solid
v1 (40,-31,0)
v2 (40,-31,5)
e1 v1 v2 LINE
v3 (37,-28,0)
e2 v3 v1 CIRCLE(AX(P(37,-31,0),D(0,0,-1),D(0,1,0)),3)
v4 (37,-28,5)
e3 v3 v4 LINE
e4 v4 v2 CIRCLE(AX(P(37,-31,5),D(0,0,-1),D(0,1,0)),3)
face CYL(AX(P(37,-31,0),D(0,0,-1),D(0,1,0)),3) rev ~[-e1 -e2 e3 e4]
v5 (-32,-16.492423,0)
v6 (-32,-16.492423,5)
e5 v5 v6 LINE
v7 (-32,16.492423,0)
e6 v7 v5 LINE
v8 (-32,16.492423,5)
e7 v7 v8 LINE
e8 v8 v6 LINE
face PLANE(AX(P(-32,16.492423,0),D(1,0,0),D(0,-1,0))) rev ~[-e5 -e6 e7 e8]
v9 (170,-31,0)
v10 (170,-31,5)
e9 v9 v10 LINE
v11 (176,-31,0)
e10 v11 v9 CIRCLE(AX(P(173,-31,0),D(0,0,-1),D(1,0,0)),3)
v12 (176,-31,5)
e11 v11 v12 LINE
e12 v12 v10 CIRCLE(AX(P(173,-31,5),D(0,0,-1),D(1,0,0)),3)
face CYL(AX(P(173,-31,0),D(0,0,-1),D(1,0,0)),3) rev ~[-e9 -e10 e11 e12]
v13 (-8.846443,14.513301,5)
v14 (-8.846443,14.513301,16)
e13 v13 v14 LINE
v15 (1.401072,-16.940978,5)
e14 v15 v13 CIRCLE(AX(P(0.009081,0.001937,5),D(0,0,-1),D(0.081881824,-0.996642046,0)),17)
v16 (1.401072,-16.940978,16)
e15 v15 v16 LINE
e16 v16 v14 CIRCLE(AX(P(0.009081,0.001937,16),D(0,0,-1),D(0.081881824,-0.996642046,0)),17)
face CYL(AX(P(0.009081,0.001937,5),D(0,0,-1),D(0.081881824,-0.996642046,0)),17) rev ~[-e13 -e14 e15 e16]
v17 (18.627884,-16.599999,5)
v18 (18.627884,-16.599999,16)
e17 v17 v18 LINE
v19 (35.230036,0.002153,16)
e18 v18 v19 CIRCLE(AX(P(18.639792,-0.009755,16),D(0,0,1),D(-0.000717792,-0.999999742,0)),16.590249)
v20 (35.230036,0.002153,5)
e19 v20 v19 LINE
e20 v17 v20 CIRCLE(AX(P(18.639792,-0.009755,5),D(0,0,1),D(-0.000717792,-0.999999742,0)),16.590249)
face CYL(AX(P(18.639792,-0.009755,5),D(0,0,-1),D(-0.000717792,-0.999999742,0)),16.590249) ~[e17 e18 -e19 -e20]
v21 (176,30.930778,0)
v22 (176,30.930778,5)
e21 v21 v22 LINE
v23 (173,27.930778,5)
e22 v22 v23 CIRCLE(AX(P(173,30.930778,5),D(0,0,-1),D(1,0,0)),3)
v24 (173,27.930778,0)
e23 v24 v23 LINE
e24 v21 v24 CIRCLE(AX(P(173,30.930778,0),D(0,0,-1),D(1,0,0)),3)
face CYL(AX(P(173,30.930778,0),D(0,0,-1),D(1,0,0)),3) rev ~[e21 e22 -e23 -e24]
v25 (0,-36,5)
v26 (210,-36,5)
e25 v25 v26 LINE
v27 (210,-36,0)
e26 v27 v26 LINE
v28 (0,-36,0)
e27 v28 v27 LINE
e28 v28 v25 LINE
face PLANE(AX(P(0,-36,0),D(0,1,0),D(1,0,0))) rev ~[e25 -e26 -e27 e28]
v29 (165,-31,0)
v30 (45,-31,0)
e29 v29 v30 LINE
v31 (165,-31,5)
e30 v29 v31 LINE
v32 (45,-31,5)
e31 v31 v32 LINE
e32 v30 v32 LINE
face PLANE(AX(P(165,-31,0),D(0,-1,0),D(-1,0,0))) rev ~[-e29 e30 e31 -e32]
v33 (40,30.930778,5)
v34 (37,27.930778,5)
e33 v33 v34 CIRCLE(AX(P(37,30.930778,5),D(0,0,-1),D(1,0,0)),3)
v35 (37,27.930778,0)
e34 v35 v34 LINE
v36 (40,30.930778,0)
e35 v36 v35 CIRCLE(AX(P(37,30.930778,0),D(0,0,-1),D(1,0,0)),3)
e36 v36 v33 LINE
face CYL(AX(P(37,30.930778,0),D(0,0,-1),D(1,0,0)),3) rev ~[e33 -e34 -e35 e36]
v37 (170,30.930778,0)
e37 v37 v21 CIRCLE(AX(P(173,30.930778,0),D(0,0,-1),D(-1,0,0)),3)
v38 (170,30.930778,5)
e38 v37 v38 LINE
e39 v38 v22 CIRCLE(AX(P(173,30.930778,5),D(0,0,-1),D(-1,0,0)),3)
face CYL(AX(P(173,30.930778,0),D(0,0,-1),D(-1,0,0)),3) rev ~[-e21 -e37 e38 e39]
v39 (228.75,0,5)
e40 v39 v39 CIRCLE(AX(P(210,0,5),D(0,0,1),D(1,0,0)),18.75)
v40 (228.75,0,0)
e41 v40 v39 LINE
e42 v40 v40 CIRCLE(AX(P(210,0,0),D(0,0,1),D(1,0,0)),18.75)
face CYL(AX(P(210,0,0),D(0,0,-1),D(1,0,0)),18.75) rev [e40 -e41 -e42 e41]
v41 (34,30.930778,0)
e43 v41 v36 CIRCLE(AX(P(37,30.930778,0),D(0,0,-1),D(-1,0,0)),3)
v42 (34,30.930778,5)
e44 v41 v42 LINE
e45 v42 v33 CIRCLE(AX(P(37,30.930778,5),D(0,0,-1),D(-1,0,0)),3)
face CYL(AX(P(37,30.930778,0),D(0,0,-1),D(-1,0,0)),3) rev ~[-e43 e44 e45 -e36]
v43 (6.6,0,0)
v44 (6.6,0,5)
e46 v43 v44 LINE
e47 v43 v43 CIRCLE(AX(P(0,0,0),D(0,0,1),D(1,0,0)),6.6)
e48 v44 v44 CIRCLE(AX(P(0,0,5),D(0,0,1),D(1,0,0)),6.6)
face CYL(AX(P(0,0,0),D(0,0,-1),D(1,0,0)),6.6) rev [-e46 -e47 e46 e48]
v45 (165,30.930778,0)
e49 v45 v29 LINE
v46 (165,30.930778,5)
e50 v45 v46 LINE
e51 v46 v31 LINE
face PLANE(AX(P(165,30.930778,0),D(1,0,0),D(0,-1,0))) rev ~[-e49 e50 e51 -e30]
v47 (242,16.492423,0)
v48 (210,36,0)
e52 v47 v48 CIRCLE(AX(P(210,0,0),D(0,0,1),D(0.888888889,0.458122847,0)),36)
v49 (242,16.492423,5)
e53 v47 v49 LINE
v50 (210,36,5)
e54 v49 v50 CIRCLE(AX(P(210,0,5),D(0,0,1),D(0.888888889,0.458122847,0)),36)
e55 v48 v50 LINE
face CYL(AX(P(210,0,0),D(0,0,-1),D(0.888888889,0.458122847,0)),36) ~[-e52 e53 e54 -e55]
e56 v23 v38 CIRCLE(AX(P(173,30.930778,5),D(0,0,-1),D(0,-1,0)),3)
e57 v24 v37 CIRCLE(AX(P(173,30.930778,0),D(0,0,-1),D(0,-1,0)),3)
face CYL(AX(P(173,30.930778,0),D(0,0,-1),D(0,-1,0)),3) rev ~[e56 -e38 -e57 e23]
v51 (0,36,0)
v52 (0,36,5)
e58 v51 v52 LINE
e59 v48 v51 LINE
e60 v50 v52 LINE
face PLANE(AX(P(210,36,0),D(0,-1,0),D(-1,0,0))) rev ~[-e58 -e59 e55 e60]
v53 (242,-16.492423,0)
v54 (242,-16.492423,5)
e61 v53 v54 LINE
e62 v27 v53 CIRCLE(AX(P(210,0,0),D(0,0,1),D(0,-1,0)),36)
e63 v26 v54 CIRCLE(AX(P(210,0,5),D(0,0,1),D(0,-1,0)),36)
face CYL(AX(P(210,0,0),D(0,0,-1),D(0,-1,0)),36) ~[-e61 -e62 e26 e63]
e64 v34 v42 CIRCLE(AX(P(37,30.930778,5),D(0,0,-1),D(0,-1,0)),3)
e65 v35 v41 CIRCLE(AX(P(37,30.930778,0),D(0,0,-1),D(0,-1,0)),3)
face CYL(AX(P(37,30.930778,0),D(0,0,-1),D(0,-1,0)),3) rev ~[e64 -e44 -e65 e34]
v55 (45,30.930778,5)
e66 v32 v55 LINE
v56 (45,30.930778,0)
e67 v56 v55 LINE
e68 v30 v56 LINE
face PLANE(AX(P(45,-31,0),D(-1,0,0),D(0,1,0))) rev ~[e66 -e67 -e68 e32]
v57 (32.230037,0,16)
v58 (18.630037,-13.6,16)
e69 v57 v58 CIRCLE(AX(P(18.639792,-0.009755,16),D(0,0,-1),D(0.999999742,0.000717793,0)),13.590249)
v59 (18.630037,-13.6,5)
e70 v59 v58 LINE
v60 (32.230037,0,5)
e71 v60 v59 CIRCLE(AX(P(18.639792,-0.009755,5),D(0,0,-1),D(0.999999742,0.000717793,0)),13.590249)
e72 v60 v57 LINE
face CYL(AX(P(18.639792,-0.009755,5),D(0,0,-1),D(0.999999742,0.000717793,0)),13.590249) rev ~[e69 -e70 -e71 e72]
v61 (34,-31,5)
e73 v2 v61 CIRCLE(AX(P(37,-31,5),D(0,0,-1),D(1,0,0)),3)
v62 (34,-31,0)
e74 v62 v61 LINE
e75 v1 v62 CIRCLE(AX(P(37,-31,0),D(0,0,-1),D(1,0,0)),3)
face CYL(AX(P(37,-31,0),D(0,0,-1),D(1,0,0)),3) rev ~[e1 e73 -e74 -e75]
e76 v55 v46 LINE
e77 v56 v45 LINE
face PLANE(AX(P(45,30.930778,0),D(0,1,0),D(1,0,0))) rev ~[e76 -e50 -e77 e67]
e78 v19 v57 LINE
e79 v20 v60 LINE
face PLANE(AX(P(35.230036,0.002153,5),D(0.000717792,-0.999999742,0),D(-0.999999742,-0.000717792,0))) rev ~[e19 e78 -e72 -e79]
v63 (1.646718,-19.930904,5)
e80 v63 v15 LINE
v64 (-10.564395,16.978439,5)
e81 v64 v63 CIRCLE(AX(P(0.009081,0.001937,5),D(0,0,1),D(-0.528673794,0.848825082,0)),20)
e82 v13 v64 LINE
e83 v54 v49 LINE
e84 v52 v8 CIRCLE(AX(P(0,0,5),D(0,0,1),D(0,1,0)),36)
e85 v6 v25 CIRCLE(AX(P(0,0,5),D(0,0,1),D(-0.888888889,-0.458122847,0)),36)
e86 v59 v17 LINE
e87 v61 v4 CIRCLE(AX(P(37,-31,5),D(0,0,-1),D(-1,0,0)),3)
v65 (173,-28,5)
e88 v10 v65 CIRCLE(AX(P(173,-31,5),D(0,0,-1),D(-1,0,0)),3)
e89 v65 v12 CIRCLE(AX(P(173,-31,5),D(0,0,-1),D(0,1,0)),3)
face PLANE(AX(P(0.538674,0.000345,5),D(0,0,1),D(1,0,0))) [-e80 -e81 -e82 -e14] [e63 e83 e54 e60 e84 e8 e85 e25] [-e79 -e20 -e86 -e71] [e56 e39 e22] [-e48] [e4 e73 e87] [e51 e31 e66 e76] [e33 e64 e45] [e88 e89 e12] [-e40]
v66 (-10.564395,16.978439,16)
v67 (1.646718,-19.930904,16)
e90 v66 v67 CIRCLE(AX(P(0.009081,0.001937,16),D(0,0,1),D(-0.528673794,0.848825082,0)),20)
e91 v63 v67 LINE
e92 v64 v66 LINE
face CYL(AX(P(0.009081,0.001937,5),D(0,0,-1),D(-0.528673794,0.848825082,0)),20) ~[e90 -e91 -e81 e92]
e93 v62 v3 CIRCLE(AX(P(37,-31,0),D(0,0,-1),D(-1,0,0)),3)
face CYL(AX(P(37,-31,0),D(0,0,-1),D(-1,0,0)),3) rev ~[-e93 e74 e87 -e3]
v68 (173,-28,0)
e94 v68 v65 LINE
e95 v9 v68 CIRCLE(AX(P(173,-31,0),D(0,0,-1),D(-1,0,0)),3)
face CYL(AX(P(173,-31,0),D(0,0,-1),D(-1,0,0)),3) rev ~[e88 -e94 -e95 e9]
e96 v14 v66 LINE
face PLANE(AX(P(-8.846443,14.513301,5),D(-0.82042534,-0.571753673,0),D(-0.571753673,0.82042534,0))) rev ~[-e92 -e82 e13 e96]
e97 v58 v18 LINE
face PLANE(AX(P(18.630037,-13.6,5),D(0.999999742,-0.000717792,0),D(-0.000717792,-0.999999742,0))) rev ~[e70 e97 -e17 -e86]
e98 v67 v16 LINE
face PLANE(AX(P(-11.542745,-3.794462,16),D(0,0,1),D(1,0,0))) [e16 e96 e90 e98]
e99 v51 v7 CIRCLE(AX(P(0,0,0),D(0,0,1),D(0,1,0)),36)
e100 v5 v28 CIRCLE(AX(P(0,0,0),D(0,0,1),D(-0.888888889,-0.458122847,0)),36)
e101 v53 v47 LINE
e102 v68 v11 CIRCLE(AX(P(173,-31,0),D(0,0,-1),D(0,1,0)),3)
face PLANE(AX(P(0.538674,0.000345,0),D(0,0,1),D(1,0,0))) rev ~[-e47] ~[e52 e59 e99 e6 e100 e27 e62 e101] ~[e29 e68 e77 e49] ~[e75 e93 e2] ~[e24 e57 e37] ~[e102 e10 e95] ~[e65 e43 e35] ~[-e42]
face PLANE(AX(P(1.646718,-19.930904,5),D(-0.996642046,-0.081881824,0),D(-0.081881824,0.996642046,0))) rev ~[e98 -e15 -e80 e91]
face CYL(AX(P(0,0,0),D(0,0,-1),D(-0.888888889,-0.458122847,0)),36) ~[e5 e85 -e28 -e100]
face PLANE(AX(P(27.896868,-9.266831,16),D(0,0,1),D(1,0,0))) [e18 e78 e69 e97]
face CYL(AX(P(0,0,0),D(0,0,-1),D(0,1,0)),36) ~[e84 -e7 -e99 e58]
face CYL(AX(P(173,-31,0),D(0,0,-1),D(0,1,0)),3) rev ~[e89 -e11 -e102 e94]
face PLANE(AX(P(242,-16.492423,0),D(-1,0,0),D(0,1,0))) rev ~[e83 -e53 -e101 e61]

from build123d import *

# Parameters (mm, degrees)
F0_R     = 30
F0_R_2   = 10
F0_R_3   = 21.5
F0_R_4   = 18.75
F0_R_5   = 6.6
F1_DEPTH = 5
F3_DEPTH = 11


with BuildPart() as f1:
    # F0 (on Top) → F1 (new body)
    with BuildSketch(Plane.XY):
        with BuildLine():
            ThreePointArc((18.3030052177, -31), (31.2642622481, -17.8478543831), (36, 0))
            ThreePointArc((36, 0), (31.2978497092, 17.7888898917), (18.4197442455, 30.9307779069))
            ThreePointArc((18.4197442455, 30.9307779069), (9.5522770937, 34.7095664382), (0, 36))
            ThreePointArc((0, 36), (-18.7386337537, 30.7386337537), (-32, 16.4924225025))
            Line((-32, 16.4924225025), (-32, -16.4924225025))
            ThreePointArc((-32, -16.4924225025), (-18.7386337537, -30.7386337537), (0, -36))
            ThreePointArc((0, -36), (9.4868329805, -34.7275107084), (18.3030052177, -31))
        make_face()
        Circle(F0_R, mode=Mode.SUBTRACT)
        with BuildLine():
            ThreePointArc((242, 16.4924225025), (228.7386337537, 30.7386337537), (210, 36))
            ThreePointArc((210, 36), (200.4477229063, 34.7095664382), (191.5802557545, 30.9307779069))
            ThreePointArc((191.5802557545, 30.9307779069), (174.0000639573, -0.0678595955), (191.6969947823, -31))
            ThreePointArc((191.6969947823, -31), (200.5131670195, -34.7275107084), (210, -36))
            ThreePointArc((210, -36), (228.7386337537, -30.7386337537), (242, -16.4924225025))
            Line((242, -16.4924225025), (242, 16.4924225025))
        make_face()
        with Locations((210, 0)):
            Circle(F0_R, mode=Mode.SUBTRACT)
        Circle(F0_R)
        Circle(F0_R_2, mode=Mode.SUBTRACT)
        with Locations((210, 0)):
            Circle(F0_R)
        with Locations((210, 0)):
            Circle(F0_R_3, mode=Mode.SUBTRACT)
        with Locations((210, 0)):
            Circle(F0_R_3)
        with Locations((210, 0)):
            Circle(F0_R_4, mode=Mode.SUBTRACT)
        with BuildLine():
            ThreePointArc((19.6214168703, 36), (23.4046464655, 33.6633706545), (26.9125802938, 30.9307779069))
            Line((26.9125802938, 30.9307779069), (34, 30.9307779069))
            ThreePointArc((34, 30.9307779069), (37, 33.9307779069), (40, 30.9307779069))
            Line((40, 30.9307779069), (45, 30.9307779069))
            Line((45, 30.9307779069), (165, 30.9307779069))
            Line((165, 30.9307779069), (170, 30.9307779069))
            ThreePointArc((170, 30.9307779069), (173, 33.9307779069), (176, 30.9307779069))
            Line((176, 30.9307779069), (183.0874197062, 30.9307779069))
            ThreePointArc((183.0874197062, 30.9307779069), (186.5953535345, 33.6633706545), (190.3785831296, 36))
            Line((190.3785831296, 36), (19.6214168703, 36))
        make_face()
        with BuildLine():
            Line((34, -31), (26.83281573, -31))
            ThreePointArc((26.83281573, -31), (23.361269906, -33.693487032), (19.6214168703, -36))
            Line((19.6214168703, -36), (190.3785831296, -36))
            ThreePointArc((190.3785831296, -36), (186.638730094, -33.693487032), (183.16718427, -31))
            Line((183.16718427, -31), (176, -31))
            ThreePointArc((176, -31), (173, -34), (170, -31))
            Line((170, -31), (165, -31))
            Line((165, -31), (45, -31))
            Line((45, -31), (40, -31))
            ThreePointArc((40, -31), (37, -34), (34, -31))
        make_face()
        with BuildLine():
            Line((37, 27.9307779069), (37, 17.6635217327))
            ThreePointArc((37, 17.6635217327), (39.9874980463, 9.0553851381), (41, 0))
            ThreePointArc((41, 0), (39.9874980463, -9.0553851381), (37, -17.6635217327))
            Line((37, -17.6635217327), (37, -28))
            ThreePointArc((37, -28), (39.1213203436, -28.8786796564), (40, -31))
            Line((40, -31), (45, -31))
            Line((45, -31), (45, 30.9307779069))
            Line((45, 30.9307779069), (40, 30.9307779069))
            ThreePointArc((40, 30.9307779069), (39.1213203436, 28.8094575634), (37, 27.9307779069))
        make_face()
        with BuildLine():
            ThreePointArc((173, -17.6635217327), (169, 0), (173, 17.6635217327))
            Line((173, 17.6635217327), (173, 27.9307779069))
            ThreePointArc((173, 27.9307779069), (170.8786796564, 28.8094575634), (170, 30.9307779069))
            Line((170, 30.9307779069), (165, 30.9307779069))
            Line((165, 30.9307779069), (165, -31))
            Line((165, -31), (170, -31))
            ThreePointArc((170, -31), (170.8786796564, -28.8786796564), (173, -28))
            Line((173, -28), (173, -17.6635217327))
        make_face()
        Circle(F0_R_2)
        Circle(F0_R_5, mode=Mode.SUBTRACT)
        with BuildLine():
            ThreePointArc((18.4197442455, 30.9307779069), (31.2978497092, 17.7888898917), (36, 0))
            ThreePointArc((36, 0), (31.2642622481, -17.8478543831), (18.3030052177, -31))
            Line((18.3030052177, -31), (26.83281573, -31))
            ThreePointArc((26.83281573, -31), (32.6055594055, -24.8571417474), (37, -17.6635217327))
            Line((37, -17.6635217327), (37, 17.6635217327))
            ThreePointArc((37, 17.6635217327), (32.6375474194, 24.815126404), (26.9125802938, 30.9307779069))
            Line((26.9125802938, 30.9307779069), (18.4197442455, 30.9307779069))
        make_face()
        with BuildLine():
            Line((191.5802557545, 30.9307779069), (183.0874197062, 30.9307779069))
            ThreePointArc((183.0874197062, 30.9307779069), (177.3624525806, 24.815126404), (173, 17.6635217327))
            Line((173, 17.6635217327), (173, -17.6635217327))
            ThreePointArc((173, -17.6635217327), (177.3944405945, -24.8571417474), (183.16718427, -31))
            Line((183.16718427, -31), (191.6969947823, -31))
            ThreePointArc((191.6969947823, -31), (174.0000639573, -0.0678595955), (191.5802557545, 30.9307779069))
        make_face()
        with BuildLine():
            ThreePointArc((41, 0), (39.9874980463, 9.0553851381), (37, 17.6635217327))
            Line((37, 17.6635217327), (37, -17.6635217327))
            ThreePointArc((37, -17.6635217327), (39.9874980463, -9.0553851381), (41, 0))
        make_face()
        with BuildLine():
            Line((173, -17.6635217327), (173, 17.6635217327))
            ThreePointArc((173, 17.6635217327), (169, 0), (173, -17.6635217327))
        make_face()
        with BuildLine():
            ThreePointArc((0, 36), (9.5522770937, 34.7095664382), (18.4197442455, 30.9307779069))
            Line((18.4197442455, 30.9307779069), (26.9125802938, 30.9307779069))
            ThreePointArc((26.9125802938, 30.9307779069), (23.4046464655, 33.6633706545), (19.6214168703, 36))
            Line((19.6214168703, 36), (0, 36))
        make_face()
        with BuildLine():
            Line((210, 36), (190.3785831296, 36))
            ThreePointArc((190.3785831296, 36), (186.5953535345, 33.6633706545), (183.0874197062, 30.9307779069))
            Line((183.0874197062, 30.9307779069), (191.5802557545, 30.9307779069))
            ThreePointArc((191.5802557545, 30.9307779069), (200.4477229063, 34.7095664382), (210, 36))
        make_face()
        with BuildLine():
            Line((26.83281573, -31), (18.3030052177, -31))
            ThreePointArc((18.3030052177, -31), (9.4868329805, -34.7275107084), (0, -36))
            Line((0, -36), (19.6214168703, -36))
            ThreePointArc((19.6214168703, -36), (23.361269906, -33.693487032), (26.83281573, -31))
        make_face()
        with BuildLine():
            ThreePointArc((183.16718427, -31), (186.638730094, -33.693487032), (190.3785831296, -36))
            Line((190.3785831296, -36), (210, -36))
            ThreePointArc((210, -36), (200.5131670195, -34.7275107084), (191.6969947823, -31))
            Line((191.6969947823, -31), (183.16718427, -31))
        make_face()
        with BuildLine():
            ThreePointArc((37, -17.6635217327), (32.6055594055, -24.8571417474), (26.83281573, -31))
            Line((26.83281573, -31), (34, -31))
            ThreePointArc((34, -31), (34.8786796564, -28.8786796564), (37, -28))
            Line((37, -28), (37, -17.6635217327))
        make_face()
        with BuildLine():
            Line((176, -31), (183.16718427, -31))
            ThreePointArc((183.16718427, -31), (177.3944405945, -24.8571417474), (173, -17.6635217327))
            Line((173, -17.6635217327), (173, -28))
            ThreePointArc((173, -28), (175.1213203436, -28.8786796564), (176, -31))
        make_face()
        with BuildLine():
            Line((34, 30.9307779069), (26.9125802938, 30.9307779069))
            ThreePointArc((26.9125802938, 30.9307779069), (32.6375474194, 24.815126404), (37, 17.6635217327))
            Line((37, 17.6635217327), (37, 27.9307779069))
            ThreePointArc((37, 27.9307779069), (34.8786796564, 28.8094575634), (34, 30.9307779069))
        make_face()
        with BuildLine():
            ThreePointArc((173, 17.6635217327), (177.3624525806, 24.815126404), (183.0874197062, 30.9307779069))
            Line((183.0874197062, 30.9307779069), (176, 30.9307779069))
            ThreePointArc((176, 30.9307779069), (175.1213203436, 28.8094575634), (173, 27.9307779069))
            Line((173, 27.9307779069), (173, 17.6635217327))
        make_face()
    extrude(amount=F1_DEPTH)

    # F2 (on face) → F3 (join)
    with BuildSketch(Plane.XY.offset(5)):
        with BuildLine():
            ThreePointArc((32.2300370842, 0), (28.249548951, -9.6195118668), (18.6300370842, -13.6))
            Line((18.6300370842, -13.6), (18.6278837067, -16.5999992272))
            ThreePointArc((18.6278837067, -16.5999992272), (30.3708692945, -11.7408322103), (35.2300363114, 0.0021533775))
            Line((35.2300363114, 0.0021533775), (32.2300370842, 0))
        make_face()
        with BuildLine():
            ThreePointArc((1.4010723087, -16.9409777332), (-16.154736314, -5.264086135), (-8.8464426541, 14.5133013966))
            Line((-8.8464426541, 14.5133013966), (-10.5643945811, 16.9784386755))
            ThreePointArc((-10.5643945811, 16.9784386755), (-18.9787357989, -6.2800054738), (1.6467177805, -19.9309038698))
            Line((1.6467177805, -19.9309038698), (1.4010723087, -16.9409777332))
        make_face()
    extrude(amount=F3_DEPTH)


solid = f1.part
